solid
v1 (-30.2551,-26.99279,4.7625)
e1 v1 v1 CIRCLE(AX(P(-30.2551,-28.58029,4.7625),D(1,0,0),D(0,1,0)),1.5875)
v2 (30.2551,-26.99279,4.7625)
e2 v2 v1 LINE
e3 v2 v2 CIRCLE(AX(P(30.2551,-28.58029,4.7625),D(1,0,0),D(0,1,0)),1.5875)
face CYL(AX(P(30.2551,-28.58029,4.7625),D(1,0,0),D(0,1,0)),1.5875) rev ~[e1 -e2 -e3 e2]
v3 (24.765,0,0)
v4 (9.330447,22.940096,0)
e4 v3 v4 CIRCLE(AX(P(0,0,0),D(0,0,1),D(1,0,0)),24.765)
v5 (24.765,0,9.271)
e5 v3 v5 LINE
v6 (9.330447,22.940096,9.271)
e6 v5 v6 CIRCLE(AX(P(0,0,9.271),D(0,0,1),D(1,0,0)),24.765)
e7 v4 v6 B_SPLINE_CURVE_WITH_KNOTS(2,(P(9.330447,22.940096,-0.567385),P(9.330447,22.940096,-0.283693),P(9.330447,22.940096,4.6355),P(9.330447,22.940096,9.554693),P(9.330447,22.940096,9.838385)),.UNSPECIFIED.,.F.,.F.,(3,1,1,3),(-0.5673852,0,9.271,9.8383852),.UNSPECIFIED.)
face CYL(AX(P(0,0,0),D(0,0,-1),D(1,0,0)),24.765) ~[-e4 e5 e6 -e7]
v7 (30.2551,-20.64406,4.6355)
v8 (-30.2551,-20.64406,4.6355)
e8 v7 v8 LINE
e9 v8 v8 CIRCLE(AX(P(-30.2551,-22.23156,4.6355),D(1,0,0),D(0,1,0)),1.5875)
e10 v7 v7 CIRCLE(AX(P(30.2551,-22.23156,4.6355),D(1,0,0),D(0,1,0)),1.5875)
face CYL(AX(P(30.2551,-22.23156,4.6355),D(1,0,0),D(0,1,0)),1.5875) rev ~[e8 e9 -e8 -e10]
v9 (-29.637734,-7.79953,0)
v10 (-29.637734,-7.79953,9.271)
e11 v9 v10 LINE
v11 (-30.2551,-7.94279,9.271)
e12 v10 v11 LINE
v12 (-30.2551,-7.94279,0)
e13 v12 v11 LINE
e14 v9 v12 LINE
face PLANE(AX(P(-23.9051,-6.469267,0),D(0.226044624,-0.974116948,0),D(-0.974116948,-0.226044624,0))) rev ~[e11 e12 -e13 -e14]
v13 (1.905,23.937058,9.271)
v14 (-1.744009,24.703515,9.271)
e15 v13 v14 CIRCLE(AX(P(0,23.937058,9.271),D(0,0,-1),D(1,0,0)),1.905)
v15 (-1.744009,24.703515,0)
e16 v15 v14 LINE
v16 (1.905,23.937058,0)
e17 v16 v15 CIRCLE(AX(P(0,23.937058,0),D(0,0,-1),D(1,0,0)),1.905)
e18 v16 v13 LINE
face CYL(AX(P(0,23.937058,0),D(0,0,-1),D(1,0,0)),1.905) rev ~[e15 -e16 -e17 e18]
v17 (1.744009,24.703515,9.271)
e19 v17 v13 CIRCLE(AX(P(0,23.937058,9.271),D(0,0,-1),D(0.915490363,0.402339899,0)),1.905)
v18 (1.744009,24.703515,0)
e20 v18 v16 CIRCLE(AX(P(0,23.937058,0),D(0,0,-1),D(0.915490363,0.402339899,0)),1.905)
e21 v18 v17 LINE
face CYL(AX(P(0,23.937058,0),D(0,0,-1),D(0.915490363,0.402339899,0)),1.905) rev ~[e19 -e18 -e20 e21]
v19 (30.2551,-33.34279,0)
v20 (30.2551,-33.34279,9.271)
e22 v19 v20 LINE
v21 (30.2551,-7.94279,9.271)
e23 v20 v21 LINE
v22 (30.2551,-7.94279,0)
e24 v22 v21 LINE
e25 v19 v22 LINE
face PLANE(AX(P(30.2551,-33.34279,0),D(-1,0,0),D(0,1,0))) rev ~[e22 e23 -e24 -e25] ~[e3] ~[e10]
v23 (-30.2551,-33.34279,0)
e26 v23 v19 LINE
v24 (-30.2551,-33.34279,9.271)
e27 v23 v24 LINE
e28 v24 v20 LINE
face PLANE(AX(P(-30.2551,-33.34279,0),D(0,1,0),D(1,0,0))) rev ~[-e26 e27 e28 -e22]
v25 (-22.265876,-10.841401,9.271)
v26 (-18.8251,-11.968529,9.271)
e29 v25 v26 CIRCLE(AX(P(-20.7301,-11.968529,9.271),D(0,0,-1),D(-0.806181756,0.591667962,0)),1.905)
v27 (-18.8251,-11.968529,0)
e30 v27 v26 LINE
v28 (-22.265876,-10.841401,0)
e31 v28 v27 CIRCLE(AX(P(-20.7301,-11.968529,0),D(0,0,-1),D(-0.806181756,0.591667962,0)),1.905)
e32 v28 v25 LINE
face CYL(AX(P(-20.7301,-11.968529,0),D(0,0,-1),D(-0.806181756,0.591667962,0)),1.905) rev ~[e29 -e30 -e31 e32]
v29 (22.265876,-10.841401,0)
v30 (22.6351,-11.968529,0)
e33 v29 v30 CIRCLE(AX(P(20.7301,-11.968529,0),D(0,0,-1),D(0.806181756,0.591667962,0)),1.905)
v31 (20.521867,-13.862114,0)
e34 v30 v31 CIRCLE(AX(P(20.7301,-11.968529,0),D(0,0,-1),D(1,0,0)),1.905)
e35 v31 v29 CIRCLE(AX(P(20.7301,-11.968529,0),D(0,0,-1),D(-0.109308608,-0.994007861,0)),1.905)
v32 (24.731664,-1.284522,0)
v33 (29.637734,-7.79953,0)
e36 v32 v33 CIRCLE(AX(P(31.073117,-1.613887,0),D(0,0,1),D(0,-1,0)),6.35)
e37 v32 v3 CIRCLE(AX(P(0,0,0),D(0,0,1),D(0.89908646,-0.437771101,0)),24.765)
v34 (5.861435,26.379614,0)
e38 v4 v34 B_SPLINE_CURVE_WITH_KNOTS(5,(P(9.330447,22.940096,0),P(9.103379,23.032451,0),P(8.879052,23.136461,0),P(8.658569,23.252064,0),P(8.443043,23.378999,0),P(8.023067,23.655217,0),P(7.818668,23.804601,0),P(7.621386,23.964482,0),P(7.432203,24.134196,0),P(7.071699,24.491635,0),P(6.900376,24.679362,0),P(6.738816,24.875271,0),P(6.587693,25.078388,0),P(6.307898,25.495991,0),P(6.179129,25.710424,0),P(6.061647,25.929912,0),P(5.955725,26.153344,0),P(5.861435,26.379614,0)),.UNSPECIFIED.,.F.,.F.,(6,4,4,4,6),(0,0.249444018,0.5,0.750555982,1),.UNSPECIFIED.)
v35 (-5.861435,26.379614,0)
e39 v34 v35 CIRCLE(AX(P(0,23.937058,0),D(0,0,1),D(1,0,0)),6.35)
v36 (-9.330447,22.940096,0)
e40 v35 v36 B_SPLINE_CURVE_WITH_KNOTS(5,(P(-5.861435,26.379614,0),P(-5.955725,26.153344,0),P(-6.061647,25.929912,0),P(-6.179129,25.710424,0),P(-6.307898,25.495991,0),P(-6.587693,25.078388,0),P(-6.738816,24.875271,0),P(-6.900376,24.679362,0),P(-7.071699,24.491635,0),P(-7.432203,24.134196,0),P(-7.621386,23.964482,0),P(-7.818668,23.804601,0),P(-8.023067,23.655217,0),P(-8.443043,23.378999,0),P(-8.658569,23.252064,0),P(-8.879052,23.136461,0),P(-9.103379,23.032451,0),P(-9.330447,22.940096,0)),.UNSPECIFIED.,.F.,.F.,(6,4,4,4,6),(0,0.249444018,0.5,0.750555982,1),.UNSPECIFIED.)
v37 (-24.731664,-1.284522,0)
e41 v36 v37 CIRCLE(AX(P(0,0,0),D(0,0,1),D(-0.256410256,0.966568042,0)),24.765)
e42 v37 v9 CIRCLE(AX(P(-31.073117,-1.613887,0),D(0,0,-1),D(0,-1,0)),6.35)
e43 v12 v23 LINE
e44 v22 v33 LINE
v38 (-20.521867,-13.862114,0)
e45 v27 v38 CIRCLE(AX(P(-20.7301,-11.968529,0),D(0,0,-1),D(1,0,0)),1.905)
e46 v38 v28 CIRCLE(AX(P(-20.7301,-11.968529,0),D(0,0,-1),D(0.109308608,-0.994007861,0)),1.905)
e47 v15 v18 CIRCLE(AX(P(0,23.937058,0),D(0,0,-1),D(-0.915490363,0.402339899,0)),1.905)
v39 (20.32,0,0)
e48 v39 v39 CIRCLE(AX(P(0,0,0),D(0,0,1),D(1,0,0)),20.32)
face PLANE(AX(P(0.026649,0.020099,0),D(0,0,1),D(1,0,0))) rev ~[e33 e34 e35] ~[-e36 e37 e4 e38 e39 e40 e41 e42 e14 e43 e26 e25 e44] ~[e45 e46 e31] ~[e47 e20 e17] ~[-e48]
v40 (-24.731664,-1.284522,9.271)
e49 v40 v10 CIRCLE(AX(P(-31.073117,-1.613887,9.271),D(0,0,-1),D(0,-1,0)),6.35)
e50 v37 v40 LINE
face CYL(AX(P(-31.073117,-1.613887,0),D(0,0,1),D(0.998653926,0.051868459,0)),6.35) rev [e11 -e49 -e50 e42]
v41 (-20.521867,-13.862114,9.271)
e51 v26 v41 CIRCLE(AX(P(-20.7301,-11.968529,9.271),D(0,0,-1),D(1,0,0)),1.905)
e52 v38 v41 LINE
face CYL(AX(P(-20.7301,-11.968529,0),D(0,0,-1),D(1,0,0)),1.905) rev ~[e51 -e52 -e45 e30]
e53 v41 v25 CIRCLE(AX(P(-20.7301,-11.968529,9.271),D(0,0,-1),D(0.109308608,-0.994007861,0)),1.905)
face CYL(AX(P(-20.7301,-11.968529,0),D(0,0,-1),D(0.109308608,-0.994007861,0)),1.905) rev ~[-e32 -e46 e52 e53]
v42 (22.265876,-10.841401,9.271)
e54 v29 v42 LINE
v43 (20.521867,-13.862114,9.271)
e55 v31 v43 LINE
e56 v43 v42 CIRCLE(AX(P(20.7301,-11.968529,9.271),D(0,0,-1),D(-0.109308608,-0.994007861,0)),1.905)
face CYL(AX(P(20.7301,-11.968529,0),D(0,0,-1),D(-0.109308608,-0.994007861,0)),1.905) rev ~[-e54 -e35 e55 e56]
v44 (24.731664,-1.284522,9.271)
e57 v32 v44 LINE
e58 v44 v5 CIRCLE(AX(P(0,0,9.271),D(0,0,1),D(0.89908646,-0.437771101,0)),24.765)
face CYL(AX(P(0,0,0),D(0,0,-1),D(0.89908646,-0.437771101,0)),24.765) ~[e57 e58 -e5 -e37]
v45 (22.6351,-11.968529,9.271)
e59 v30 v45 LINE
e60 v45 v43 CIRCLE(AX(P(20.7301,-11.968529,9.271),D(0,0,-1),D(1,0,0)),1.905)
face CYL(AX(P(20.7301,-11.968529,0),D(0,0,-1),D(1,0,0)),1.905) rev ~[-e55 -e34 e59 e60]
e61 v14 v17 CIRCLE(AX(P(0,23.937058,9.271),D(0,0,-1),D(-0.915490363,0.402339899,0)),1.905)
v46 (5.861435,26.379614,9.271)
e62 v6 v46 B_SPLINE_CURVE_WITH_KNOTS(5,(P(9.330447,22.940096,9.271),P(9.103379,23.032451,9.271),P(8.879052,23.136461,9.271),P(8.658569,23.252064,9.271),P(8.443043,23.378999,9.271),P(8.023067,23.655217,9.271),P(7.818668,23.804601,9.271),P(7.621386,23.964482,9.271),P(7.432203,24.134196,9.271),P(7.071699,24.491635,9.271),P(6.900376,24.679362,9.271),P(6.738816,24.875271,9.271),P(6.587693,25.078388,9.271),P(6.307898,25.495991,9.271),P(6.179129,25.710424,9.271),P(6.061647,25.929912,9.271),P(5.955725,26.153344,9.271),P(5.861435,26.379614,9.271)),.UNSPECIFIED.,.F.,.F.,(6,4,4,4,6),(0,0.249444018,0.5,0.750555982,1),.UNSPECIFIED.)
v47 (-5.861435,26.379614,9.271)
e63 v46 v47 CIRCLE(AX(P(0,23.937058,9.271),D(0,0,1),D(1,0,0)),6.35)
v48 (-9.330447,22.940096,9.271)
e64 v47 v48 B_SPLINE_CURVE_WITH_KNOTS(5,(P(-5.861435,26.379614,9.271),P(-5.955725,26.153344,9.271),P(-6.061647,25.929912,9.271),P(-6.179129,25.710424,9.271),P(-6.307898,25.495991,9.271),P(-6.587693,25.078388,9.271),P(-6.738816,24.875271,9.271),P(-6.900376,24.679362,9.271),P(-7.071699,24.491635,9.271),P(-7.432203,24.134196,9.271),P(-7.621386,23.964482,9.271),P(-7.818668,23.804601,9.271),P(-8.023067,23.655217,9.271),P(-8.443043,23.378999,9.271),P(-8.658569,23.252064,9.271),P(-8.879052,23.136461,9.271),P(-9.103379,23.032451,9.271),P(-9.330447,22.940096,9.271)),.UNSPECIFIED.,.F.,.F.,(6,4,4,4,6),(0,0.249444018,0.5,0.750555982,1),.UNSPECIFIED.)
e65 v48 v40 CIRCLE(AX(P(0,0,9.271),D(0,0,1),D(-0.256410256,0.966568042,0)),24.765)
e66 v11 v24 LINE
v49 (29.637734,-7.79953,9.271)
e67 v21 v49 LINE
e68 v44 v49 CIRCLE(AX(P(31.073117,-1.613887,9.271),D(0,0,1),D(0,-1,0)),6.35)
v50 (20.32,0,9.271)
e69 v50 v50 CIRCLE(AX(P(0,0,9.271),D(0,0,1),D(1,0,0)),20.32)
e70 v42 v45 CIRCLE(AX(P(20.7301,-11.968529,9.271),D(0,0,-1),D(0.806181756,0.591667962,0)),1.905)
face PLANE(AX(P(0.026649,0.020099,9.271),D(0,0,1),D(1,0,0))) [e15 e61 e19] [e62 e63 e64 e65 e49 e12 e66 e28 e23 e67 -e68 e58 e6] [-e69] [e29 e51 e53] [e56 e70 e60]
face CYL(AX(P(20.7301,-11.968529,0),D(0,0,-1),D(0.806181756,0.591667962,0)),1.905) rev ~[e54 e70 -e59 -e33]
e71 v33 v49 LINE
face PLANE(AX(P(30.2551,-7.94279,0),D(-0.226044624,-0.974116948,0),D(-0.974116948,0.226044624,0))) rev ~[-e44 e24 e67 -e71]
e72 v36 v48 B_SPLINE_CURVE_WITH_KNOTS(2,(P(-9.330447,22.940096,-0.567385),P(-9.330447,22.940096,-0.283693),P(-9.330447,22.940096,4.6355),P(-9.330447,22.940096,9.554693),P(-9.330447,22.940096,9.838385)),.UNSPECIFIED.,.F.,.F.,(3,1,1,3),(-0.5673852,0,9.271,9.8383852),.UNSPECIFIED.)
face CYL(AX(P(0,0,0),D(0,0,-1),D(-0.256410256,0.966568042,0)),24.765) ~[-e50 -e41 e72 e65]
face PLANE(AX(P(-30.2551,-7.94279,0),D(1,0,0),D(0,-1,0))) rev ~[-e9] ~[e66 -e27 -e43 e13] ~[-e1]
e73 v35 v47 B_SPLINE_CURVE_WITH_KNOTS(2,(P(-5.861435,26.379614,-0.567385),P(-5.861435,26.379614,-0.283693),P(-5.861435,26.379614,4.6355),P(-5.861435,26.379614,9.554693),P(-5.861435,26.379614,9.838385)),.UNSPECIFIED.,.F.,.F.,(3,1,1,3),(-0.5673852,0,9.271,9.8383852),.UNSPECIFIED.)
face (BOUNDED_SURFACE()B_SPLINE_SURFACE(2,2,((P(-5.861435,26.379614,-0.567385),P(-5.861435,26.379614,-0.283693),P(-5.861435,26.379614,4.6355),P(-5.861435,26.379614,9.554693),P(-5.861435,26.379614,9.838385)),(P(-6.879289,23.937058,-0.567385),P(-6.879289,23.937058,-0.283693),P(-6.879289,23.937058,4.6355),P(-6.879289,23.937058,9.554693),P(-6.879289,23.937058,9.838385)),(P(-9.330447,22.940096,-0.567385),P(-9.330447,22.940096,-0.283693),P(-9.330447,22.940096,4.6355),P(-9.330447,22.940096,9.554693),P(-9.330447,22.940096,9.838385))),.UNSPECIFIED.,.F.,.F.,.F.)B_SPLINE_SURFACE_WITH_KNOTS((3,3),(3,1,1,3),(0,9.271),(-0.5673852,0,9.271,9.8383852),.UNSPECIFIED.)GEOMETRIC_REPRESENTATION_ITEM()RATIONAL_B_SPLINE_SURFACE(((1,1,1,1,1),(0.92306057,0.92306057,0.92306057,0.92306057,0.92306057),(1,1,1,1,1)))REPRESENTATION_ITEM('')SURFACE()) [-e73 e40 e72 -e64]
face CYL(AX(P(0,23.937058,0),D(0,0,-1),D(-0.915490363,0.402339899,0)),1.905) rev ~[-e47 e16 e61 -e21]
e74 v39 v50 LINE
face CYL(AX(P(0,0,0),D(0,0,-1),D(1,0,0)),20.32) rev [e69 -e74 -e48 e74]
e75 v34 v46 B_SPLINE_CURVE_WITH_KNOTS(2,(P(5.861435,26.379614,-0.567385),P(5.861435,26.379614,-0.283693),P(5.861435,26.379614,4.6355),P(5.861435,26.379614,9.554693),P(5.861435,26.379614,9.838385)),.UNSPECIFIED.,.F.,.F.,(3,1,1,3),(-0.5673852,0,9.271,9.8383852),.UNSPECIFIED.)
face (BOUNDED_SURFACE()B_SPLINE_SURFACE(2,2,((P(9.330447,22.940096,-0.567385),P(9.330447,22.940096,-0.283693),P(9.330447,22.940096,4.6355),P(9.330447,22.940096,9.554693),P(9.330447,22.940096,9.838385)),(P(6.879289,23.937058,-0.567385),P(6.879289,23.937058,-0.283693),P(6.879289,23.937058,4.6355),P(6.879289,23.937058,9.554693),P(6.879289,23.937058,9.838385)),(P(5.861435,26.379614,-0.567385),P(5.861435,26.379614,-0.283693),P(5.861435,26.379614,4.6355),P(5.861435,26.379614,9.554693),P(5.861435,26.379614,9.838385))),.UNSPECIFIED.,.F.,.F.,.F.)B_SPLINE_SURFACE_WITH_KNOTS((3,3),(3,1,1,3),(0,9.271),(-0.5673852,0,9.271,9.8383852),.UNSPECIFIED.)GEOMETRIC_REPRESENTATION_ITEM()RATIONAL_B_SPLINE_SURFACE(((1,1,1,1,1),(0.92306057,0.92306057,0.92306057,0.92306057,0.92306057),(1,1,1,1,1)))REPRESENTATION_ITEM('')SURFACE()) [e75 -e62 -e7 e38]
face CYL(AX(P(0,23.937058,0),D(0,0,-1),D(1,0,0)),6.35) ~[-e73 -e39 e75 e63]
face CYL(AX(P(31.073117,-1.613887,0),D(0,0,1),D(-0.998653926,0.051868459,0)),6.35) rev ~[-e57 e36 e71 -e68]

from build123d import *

# Parameters (mm, degrees)
F0_R     = 20.32
F1_DEPTH = 9.271
F2_R     = 1.5875
F3_DEPTH = 60.511199891
F4_R     = 6.35


# Not quite as in the source:
# - a feature names something its author has since deleted; it is built from what else it names


with BuildPart() as f1:
    # F0 (on Top) → F1 (new body)
    with BuildSketch(Plane.XY):
        with BuildLine():
            ThreePointArc((23.9050999455, -6.4692674698), (24.5490837421, -3.2630832697), (24.765, 0))
            ThreePointArc((24.765, 0), (19.6285885254, 15.1004548773), (6.35, 23.9370575677))
            ThreePointArc((6.35, 23.9370575677), (4.0651088886, 24.4290833787), (1.7440091422, 24.703515076))
            ThreePointArc((1.7440091422, 24.703515076), (1.8643178935, 24.3286489263), (1.905, 23.9370575677))
            ThreePointArc((1.905, 23.9370575677), (-0.3915913586, 22.0727396742), (-1.7440091422, 24.703515076))
            ThreePointArc((-1.7440091422, 24.703515076), (-4.0651088886, 24.4290833787), (-6.35, 23.9370575677))
            ThreePointArc((-6.35, 23.9370575677), (-21.4471191247, 12.3825), (-23.9050999455, -6.4692674698))
            ThreePointArc((-23.9050999455, -6.4692674698), (-23.1887612414, -8.6940541227), (-22.2658761897, -10.8414013165))
            ThreePointArc((-22.2658761897, -10.8414013165), (-20.1370690632, -10.1581864481), (-18.8250999455, -11.9685287839))
            ThreePointArc((-18.8250999455, -11.9685287839), (-19.3113489683, -13.239815795), (-20.5218670475, -13.8621137596))
            ThreePointArc((-20.5218670475, -13.8621137596), (-19.1236523528, -15.735029256), (-17.5550999455, -17.4677900979))
            ThreePointArc((-17.5550999455, -17.4677900979), (0, -24.765), (17.5550999455, -17.4677900979))
            ThreePointArc((17.5550999455, -17.4677900979), (19.1236523528, -15.735029256), (20.5218670475, -13.8621137596))
            ThreePointArc((20.5218670475, -13.8621137596), (19.0803215513, -11.0160287839), (22.2658761897, -10.8414013165))
            ThreePointArc((22.2658761897, -10.8414013165), (23.1887612414, -8.6940541227), (23.9050999455, -6.4692674698))
        make_face()
        Circle(F0_R, mode=Mode.SUBTRACT)
        with BuildLine():
            ThreePointArc((-22.2658761897, -10.8414013165), (-23.1887612414, -8.6940541227), (-23.9050999455, -6.4692674698))
            ThreePointArc((-23.9050999455, -6.4692674698), (-26.2293612595, -15.1435287839), (-17.5550999455, -17.4677900979))
            ThreePointArc((-17.5550999455, -17.4677900979), (-19.1236523528, -15.735029256), (-20.5218670475, -13.8621137596))
            ThreePointArc((-20.5218670475, -13.8621137596), (-22.3798783397, -12.9210287839), (-22.2658761897, -10.8414013165))
        make_face()
        with BuildLine():
            ThreePointArc((17.5550999455, -17.4677900979), (26.2293612595, -15.1435287839), (23.9050999455, -6.4692674698))
            ThreePointArc((23.9050999455, -6.4692674698), (23.1887612414, -8.6940541227), (22.2658761897, -10.8414013165))
            ThreePointArc((22.2658761897, -10.8414013165), (22.5404422812, -11.3754979015), (22.6350999455, -11.9685287839))
            ThreePointArc((22.6350999455, -11.9685287839), (22.0013869566, -13.3872797611), (20.5218670475, -13.8621137596))
            ThreePointArc((20.5218670475, -13.8621137596), (19.1236523528, -15.735029256), (17.5550999455, -17.4677900979))
        make_face()
        with BuildLine():
            Line((30.2550999455, -7.9427900979), (23.9050999455, -6.4692674698))
            ThreePointArc((23.9050999455, -6.4692674698), (26.2293612595, -15.1435287839), (17.5550999455, -17.4677900979))
            ThreePointArc((17.5550999455, -17.4677900979), (0, -24.765), (-17.5550999455, -17.4677900979))
            ThreePointArc((-17.5550999455, -17.4677900979), (-26.2293612595, -15.1435287839), (-23.9050999455, -6.4692674698))
            Line((-23.9050999455, -6.4692674698), (-30.2550999455, -7.9427900979))
            Line((-30.2550999455, -7.9427900979), (-30.2550999455, -33.3427900979))
            Line((-30.2550999455, -33.3427900979), (30.2550999455, -33.3427900979))
            Line((30.2550999455, -33.3427900979), (30.2550999455, -7.9427900979))
        make_face()
        with BuildLine():
            ThreePointArc((1.7440091422, 24.703515076), (4.0651088886, 24.4290833787), (6.35, 23.9370575677))
            ThreePointArc((6.35, 23.9370575677), (0, 30.2870575677), (-6.35, 23.9370575677))
            ThreePointArc((-6.35, 23.9370575677), (-4.0651088886, 24.4290833787), (-1.7440091422, 24.703515076))
            ThreePointArc((-1.7440091422, 24.703515076), (0, 25.8420575677), (1.7440091422, 24.703515076))
        make_face()
    extrude(amount=F1_DEPTH)

    # F2 (on face) → F3 (cut, through all)
    with BuildSketch(Plane.YZ.offset(30.2550999455)):
        with Locations((-28.5802900979, 4.7625)):
            Circle(F2_R)
        with Locations((-22.2315602249, 4.6355)):
            Circle(F2_R)
    extrude(amount=-F3_DEPTH, mode=Mode.SUBTRACT)

    # F4
    f4_edges = [f1.edges().sort_by_distance(p)[0] for p in [
        (-23.9051, -6.469267, 4.6355),
        (23.9051, -6.469267, 4.6355),
        (6.35, 23.937058, 4.6355),
        (-6.35, 23.937058, 4.6355),
    ]]
    fillet(f4_edges, radius=F4_R)


solid = f1.part
